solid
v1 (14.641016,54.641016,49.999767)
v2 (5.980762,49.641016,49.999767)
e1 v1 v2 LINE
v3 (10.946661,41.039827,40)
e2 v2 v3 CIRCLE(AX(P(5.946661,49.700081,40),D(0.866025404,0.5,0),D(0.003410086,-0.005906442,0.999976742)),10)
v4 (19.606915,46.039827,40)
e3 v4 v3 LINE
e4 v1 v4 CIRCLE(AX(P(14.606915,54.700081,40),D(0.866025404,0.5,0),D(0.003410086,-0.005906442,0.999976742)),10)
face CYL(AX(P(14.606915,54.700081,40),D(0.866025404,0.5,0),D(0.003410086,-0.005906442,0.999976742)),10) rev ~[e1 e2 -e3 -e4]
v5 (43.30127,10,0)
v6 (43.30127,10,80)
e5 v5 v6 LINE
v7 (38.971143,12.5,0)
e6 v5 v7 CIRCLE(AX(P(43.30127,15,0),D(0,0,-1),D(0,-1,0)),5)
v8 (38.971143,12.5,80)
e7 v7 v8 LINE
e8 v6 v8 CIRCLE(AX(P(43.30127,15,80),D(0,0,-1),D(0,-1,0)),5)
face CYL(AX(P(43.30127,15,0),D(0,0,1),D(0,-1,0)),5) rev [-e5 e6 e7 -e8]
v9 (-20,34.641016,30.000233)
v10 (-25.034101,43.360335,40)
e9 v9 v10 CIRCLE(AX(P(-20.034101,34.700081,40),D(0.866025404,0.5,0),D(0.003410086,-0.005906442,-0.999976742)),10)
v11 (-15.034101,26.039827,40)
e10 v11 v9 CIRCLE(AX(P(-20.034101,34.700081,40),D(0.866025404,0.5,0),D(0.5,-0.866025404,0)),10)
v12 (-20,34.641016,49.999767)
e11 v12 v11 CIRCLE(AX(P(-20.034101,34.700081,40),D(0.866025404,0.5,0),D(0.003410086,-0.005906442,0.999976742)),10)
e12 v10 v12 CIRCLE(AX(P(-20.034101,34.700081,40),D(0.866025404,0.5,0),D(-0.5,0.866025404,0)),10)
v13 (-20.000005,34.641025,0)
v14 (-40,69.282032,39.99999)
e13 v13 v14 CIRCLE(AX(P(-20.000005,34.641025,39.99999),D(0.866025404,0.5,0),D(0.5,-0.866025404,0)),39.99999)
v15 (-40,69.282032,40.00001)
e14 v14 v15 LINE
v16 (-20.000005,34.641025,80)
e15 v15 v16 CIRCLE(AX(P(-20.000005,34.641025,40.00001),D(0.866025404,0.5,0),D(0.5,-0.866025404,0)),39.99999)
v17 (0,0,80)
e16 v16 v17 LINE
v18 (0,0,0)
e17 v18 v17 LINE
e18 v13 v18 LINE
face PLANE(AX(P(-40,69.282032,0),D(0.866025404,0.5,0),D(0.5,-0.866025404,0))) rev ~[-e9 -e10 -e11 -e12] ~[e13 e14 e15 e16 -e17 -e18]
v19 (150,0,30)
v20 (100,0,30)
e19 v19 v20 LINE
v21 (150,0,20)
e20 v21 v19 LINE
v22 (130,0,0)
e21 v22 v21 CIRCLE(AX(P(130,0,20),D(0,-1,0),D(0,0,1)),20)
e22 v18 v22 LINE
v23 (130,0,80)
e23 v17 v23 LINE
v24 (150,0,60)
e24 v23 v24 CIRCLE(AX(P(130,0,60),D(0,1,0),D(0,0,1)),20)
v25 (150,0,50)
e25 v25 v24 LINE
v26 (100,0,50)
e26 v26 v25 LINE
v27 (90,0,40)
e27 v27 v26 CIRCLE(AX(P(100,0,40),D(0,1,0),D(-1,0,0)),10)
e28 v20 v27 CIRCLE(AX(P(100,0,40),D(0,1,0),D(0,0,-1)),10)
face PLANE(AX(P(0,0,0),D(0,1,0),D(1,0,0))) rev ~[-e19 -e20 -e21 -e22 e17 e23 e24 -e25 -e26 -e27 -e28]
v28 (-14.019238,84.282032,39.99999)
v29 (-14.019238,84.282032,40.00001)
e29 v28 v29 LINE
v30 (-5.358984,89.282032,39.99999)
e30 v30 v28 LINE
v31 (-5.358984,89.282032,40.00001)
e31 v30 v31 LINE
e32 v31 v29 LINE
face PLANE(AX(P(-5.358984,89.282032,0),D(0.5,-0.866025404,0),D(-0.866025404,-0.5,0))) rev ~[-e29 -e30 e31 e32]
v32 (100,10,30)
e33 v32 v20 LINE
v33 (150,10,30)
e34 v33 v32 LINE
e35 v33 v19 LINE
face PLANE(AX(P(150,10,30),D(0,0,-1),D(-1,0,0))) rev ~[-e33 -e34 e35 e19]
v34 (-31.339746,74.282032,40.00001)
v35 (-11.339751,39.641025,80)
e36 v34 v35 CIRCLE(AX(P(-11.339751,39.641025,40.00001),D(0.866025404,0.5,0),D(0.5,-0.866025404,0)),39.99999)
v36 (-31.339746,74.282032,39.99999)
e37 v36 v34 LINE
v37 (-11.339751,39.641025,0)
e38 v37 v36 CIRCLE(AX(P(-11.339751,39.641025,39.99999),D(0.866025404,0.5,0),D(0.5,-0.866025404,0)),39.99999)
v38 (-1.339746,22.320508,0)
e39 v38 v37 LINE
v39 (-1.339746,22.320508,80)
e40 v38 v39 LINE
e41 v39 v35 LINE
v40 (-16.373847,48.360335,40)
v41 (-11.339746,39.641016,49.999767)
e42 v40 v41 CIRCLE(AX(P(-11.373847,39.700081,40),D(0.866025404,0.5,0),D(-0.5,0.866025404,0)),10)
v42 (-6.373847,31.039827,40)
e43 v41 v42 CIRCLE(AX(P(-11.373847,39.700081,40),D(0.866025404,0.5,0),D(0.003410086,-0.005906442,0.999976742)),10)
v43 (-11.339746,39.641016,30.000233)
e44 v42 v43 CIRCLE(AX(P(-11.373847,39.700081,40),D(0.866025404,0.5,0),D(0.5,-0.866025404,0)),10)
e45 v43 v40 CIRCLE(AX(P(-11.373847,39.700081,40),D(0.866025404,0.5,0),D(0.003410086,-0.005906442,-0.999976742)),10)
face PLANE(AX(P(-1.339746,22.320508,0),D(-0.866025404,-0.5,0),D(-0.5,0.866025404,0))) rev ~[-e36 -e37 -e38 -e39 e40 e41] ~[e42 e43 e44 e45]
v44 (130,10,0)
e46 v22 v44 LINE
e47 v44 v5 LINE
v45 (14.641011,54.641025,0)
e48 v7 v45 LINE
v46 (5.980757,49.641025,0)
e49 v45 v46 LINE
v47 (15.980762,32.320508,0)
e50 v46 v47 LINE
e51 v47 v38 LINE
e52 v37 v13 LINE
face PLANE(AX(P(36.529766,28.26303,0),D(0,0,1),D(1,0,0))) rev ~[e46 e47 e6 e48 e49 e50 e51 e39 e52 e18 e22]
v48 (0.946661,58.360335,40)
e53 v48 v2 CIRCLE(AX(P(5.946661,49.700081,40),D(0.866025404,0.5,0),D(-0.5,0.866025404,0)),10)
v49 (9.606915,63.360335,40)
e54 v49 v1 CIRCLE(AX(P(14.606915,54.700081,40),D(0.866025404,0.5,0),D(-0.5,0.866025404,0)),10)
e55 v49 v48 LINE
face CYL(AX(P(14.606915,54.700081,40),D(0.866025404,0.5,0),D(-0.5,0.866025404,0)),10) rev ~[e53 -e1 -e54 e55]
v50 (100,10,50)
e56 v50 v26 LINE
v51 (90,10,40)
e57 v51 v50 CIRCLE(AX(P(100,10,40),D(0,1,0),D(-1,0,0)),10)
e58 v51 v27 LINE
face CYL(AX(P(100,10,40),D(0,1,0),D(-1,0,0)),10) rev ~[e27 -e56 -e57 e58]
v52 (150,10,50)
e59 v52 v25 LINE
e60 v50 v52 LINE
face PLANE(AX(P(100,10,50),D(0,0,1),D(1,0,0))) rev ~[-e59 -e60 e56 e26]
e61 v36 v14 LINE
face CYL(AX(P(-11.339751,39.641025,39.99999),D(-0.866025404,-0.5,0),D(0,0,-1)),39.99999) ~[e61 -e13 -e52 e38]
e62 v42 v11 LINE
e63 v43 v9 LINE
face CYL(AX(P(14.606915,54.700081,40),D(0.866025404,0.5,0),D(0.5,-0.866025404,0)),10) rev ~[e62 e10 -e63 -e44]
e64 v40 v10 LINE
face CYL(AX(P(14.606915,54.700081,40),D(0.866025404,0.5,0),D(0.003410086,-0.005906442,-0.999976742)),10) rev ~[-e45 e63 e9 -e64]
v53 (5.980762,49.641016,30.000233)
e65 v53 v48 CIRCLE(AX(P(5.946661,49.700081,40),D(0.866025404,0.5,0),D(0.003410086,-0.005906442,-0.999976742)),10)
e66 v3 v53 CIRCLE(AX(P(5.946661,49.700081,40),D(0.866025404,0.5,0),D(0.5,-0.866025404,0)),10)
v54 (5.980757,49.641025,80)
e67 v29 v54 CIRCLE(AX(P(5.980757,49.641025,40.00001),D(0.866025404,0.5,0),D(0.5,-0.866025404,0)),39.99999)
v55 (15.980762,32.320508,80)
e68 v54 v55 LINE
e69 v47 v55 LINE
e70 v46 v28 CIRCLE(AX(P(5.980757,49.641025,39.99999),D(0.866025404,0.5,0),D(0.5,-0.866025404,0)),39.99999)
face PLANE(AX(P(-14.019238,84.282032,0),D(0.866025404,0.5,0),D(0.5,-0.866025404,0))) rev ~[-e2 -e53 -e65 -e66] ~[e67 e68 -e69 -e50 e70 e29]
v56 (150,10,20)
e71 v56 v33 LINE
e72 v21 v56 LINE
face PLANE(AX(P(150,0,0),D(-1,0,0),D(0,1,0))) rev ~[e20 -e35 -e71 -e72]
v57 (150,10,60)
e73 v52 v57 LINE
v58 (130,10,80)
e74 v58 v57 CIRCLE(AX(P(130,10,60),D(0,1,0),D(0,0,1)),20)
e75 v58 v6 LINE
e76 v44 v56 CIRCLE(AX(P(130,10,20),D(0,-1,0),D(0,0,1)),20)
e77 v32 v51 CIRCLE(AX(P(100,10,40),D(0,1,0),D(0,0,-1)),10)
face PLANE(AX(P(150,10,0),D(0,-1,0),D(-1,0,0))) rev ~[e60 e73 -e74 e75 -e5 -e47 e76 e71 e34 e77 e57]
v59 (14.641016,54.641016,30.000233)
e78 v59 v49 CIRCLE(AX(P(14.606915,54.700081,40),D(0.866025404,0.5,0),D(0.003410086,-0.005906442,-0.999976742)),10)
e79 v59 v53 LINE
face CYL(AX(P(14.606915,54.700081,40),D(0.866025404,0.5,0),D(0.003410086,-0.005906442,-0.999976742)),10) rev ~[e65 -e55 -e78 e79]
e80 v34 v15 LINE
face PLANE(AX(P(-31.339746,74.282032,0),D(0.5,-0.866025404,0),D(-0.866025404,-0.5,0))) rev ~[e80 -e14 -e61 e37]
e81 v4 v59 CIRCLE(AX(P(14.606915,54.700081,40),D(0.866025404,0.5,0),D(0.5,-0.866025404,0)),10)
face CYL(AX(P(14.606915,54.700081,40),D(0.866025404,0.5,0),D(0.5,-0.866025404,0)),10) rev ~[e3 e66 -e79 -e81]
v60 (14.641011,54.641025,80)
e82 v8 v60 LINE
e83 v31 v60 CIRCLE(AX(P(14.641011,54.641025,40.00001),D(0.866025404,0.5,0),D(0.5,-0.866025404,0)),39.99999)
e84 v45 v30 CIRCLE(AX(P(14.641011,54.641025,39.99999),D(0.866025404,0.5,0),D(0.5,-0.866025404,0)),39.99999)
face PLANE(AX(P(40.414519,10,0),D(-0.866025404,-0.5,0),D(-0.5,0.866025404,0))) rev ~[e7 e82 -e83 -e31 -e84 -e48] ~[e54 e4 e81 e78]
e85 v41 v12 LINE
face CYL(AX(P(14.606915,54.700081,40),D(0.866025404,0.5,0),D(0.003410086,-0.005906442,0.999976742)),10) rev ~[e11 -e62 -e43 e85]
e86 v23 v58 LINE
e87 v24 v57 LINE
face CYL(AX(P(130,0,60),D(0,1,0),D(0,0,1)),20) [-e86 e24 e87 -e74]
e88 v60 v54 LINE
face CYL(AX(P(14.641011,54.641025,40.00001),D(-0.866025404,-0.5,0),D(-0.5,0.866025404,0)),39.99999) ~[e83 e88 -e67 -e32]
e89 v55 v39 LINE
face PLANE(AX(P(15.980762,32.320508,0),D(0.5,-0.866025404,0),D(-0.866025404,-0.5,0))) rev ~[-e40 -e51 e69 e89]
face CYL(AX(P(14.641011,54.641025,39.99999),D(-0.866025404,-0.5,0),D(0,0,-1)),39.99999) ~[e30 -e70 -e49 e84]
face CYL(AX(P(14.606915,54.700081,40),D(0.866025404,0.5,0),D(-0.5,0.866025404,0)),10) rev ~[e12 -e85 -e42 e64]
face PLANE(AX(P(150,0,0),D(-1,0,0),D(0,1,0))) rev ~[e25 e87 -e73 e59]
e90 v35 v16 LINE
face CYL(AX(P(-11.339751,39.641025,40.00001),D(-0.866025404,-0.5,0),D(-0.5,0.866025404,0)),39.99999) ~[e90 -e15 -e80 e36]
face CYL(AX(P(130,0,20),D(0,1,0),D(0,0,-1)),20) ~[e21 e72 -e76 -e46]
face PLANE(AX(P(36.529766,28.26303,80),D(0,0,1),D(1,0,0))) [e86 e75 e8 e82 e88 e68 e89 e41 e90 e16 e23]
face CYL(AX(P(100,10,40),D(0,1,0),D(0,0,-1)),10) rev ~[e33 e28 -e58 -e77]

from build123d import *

# Parameters (mm, degrees)
F1_DEPTH = 80
F3_DEPTH = 36
F4_R     = 20
F5_R     = 5
F6_R     = 39.99999
F8_DEPTH = 85


# Not quite as in the source:
# - a fillet or chamfer is up to 0.001 mm smaller than in the source, because OpenCascade refuses the exact size


with BuildPart() as f1:
    # F0 (on Top) → F1 (new body)
    with BuildSketch(Plane.XY):
        Polygon((-40, 69.2820323028), (0, 0), (150, 0), (150, 10), (40.4145188433, 10), (-5.3589838486, 89.2820323028), (-14.0192378865, 84.2820323028), (15.9807621135, 32.3205080757), (-1.3397459622, 22.3205080757), (-31.3397459622, 74.2820323028), align=None)
    extrude(amount=F1_DEPTH)

    # F2 (on face) → F3 (cut)
    with BuildSketch(Plane(origin=(0, 10, 0), x_dir=(-1, 0, 0), z_dir=(0, 1, 0))):
        with BuildLine():
            Line((-90, 40), (-150, 40))
            Line((-150, 40), (-150, 30))
            Line((-150, 30), (-100, 30))
            ThreePointArc((-100, 30), (-92.9289321881, 32.9289321881), (-90, 40))
        make_face()
        with BuildLine():
            Line((-150, 50), (-150, 40))
            Line((-150, 40), (-90, 40))
            ThreePointArc((-90, 40), (-92.9289321881, 47.0710678119), (-100, 50))
            Line((-100, 50), (-150, 50))
        make_face()
    extrude(amount=-F3_DEPTH, mode=Mode.SUBTRACT)

    # F4
    f4_edges = [f1.edges().sort_by_distance(p)[0] for p in [
        (150, 5, 80),
        (150, 5, 0),
    ]]
    fillet(f4_edges, radius=F4_R)

    # F5
    f5_edges = [f1.edges().sort_by_distance(p)[0] for p in [
        (40.414519, 10, 40),
    ]]
    fillet(f5_edges, radius=F5_R)

    # F6 (radius 40 in the source; OpenCascade refuses exactly that, so slightly less here)
    f6_edges = [f1.edges().sort_by_distance(p)[0] for p in [
        (-9.689111, 86.782032, 0),
        (-35.669873, 71.782032, 0),
        (-9.689111, 86.782032, 80),
        (-35.669873, 71.782032, 80),
    ]]
    fillet(f6_edges, radius=F6_R)

    # F7 (on face) → F8 (cut)
    with BuildSketch(Plane(origin=(34.6410161514, 20, 0), x_dir=(-0.5, 0.8660254038, 0), z_dir=(0.8660254038, 0.5, 0))):
        with BuildLine():
            ThreePointArc((50.0682017207, 40), (47.1151153286, 47.0951397875), (40, 49.9997674236))
            ThreePointArc((40, 49.9997674236), (32.9730619333, 47.0469136078), (30.0682017207, 40))
            ThreePointArc((30.0682017207, 40), (32.9730619333, 32.9530863922), (40, 30.0002325764))
            ThreePointArc((40, 30.0002325764), (47.1151153286, 32.9048602125), (50.0682017207, 40))
        make_face()
    extrude(amount=-F8_DEPTH, mode=Mode.SUBTRACT)


solid = f1.part
